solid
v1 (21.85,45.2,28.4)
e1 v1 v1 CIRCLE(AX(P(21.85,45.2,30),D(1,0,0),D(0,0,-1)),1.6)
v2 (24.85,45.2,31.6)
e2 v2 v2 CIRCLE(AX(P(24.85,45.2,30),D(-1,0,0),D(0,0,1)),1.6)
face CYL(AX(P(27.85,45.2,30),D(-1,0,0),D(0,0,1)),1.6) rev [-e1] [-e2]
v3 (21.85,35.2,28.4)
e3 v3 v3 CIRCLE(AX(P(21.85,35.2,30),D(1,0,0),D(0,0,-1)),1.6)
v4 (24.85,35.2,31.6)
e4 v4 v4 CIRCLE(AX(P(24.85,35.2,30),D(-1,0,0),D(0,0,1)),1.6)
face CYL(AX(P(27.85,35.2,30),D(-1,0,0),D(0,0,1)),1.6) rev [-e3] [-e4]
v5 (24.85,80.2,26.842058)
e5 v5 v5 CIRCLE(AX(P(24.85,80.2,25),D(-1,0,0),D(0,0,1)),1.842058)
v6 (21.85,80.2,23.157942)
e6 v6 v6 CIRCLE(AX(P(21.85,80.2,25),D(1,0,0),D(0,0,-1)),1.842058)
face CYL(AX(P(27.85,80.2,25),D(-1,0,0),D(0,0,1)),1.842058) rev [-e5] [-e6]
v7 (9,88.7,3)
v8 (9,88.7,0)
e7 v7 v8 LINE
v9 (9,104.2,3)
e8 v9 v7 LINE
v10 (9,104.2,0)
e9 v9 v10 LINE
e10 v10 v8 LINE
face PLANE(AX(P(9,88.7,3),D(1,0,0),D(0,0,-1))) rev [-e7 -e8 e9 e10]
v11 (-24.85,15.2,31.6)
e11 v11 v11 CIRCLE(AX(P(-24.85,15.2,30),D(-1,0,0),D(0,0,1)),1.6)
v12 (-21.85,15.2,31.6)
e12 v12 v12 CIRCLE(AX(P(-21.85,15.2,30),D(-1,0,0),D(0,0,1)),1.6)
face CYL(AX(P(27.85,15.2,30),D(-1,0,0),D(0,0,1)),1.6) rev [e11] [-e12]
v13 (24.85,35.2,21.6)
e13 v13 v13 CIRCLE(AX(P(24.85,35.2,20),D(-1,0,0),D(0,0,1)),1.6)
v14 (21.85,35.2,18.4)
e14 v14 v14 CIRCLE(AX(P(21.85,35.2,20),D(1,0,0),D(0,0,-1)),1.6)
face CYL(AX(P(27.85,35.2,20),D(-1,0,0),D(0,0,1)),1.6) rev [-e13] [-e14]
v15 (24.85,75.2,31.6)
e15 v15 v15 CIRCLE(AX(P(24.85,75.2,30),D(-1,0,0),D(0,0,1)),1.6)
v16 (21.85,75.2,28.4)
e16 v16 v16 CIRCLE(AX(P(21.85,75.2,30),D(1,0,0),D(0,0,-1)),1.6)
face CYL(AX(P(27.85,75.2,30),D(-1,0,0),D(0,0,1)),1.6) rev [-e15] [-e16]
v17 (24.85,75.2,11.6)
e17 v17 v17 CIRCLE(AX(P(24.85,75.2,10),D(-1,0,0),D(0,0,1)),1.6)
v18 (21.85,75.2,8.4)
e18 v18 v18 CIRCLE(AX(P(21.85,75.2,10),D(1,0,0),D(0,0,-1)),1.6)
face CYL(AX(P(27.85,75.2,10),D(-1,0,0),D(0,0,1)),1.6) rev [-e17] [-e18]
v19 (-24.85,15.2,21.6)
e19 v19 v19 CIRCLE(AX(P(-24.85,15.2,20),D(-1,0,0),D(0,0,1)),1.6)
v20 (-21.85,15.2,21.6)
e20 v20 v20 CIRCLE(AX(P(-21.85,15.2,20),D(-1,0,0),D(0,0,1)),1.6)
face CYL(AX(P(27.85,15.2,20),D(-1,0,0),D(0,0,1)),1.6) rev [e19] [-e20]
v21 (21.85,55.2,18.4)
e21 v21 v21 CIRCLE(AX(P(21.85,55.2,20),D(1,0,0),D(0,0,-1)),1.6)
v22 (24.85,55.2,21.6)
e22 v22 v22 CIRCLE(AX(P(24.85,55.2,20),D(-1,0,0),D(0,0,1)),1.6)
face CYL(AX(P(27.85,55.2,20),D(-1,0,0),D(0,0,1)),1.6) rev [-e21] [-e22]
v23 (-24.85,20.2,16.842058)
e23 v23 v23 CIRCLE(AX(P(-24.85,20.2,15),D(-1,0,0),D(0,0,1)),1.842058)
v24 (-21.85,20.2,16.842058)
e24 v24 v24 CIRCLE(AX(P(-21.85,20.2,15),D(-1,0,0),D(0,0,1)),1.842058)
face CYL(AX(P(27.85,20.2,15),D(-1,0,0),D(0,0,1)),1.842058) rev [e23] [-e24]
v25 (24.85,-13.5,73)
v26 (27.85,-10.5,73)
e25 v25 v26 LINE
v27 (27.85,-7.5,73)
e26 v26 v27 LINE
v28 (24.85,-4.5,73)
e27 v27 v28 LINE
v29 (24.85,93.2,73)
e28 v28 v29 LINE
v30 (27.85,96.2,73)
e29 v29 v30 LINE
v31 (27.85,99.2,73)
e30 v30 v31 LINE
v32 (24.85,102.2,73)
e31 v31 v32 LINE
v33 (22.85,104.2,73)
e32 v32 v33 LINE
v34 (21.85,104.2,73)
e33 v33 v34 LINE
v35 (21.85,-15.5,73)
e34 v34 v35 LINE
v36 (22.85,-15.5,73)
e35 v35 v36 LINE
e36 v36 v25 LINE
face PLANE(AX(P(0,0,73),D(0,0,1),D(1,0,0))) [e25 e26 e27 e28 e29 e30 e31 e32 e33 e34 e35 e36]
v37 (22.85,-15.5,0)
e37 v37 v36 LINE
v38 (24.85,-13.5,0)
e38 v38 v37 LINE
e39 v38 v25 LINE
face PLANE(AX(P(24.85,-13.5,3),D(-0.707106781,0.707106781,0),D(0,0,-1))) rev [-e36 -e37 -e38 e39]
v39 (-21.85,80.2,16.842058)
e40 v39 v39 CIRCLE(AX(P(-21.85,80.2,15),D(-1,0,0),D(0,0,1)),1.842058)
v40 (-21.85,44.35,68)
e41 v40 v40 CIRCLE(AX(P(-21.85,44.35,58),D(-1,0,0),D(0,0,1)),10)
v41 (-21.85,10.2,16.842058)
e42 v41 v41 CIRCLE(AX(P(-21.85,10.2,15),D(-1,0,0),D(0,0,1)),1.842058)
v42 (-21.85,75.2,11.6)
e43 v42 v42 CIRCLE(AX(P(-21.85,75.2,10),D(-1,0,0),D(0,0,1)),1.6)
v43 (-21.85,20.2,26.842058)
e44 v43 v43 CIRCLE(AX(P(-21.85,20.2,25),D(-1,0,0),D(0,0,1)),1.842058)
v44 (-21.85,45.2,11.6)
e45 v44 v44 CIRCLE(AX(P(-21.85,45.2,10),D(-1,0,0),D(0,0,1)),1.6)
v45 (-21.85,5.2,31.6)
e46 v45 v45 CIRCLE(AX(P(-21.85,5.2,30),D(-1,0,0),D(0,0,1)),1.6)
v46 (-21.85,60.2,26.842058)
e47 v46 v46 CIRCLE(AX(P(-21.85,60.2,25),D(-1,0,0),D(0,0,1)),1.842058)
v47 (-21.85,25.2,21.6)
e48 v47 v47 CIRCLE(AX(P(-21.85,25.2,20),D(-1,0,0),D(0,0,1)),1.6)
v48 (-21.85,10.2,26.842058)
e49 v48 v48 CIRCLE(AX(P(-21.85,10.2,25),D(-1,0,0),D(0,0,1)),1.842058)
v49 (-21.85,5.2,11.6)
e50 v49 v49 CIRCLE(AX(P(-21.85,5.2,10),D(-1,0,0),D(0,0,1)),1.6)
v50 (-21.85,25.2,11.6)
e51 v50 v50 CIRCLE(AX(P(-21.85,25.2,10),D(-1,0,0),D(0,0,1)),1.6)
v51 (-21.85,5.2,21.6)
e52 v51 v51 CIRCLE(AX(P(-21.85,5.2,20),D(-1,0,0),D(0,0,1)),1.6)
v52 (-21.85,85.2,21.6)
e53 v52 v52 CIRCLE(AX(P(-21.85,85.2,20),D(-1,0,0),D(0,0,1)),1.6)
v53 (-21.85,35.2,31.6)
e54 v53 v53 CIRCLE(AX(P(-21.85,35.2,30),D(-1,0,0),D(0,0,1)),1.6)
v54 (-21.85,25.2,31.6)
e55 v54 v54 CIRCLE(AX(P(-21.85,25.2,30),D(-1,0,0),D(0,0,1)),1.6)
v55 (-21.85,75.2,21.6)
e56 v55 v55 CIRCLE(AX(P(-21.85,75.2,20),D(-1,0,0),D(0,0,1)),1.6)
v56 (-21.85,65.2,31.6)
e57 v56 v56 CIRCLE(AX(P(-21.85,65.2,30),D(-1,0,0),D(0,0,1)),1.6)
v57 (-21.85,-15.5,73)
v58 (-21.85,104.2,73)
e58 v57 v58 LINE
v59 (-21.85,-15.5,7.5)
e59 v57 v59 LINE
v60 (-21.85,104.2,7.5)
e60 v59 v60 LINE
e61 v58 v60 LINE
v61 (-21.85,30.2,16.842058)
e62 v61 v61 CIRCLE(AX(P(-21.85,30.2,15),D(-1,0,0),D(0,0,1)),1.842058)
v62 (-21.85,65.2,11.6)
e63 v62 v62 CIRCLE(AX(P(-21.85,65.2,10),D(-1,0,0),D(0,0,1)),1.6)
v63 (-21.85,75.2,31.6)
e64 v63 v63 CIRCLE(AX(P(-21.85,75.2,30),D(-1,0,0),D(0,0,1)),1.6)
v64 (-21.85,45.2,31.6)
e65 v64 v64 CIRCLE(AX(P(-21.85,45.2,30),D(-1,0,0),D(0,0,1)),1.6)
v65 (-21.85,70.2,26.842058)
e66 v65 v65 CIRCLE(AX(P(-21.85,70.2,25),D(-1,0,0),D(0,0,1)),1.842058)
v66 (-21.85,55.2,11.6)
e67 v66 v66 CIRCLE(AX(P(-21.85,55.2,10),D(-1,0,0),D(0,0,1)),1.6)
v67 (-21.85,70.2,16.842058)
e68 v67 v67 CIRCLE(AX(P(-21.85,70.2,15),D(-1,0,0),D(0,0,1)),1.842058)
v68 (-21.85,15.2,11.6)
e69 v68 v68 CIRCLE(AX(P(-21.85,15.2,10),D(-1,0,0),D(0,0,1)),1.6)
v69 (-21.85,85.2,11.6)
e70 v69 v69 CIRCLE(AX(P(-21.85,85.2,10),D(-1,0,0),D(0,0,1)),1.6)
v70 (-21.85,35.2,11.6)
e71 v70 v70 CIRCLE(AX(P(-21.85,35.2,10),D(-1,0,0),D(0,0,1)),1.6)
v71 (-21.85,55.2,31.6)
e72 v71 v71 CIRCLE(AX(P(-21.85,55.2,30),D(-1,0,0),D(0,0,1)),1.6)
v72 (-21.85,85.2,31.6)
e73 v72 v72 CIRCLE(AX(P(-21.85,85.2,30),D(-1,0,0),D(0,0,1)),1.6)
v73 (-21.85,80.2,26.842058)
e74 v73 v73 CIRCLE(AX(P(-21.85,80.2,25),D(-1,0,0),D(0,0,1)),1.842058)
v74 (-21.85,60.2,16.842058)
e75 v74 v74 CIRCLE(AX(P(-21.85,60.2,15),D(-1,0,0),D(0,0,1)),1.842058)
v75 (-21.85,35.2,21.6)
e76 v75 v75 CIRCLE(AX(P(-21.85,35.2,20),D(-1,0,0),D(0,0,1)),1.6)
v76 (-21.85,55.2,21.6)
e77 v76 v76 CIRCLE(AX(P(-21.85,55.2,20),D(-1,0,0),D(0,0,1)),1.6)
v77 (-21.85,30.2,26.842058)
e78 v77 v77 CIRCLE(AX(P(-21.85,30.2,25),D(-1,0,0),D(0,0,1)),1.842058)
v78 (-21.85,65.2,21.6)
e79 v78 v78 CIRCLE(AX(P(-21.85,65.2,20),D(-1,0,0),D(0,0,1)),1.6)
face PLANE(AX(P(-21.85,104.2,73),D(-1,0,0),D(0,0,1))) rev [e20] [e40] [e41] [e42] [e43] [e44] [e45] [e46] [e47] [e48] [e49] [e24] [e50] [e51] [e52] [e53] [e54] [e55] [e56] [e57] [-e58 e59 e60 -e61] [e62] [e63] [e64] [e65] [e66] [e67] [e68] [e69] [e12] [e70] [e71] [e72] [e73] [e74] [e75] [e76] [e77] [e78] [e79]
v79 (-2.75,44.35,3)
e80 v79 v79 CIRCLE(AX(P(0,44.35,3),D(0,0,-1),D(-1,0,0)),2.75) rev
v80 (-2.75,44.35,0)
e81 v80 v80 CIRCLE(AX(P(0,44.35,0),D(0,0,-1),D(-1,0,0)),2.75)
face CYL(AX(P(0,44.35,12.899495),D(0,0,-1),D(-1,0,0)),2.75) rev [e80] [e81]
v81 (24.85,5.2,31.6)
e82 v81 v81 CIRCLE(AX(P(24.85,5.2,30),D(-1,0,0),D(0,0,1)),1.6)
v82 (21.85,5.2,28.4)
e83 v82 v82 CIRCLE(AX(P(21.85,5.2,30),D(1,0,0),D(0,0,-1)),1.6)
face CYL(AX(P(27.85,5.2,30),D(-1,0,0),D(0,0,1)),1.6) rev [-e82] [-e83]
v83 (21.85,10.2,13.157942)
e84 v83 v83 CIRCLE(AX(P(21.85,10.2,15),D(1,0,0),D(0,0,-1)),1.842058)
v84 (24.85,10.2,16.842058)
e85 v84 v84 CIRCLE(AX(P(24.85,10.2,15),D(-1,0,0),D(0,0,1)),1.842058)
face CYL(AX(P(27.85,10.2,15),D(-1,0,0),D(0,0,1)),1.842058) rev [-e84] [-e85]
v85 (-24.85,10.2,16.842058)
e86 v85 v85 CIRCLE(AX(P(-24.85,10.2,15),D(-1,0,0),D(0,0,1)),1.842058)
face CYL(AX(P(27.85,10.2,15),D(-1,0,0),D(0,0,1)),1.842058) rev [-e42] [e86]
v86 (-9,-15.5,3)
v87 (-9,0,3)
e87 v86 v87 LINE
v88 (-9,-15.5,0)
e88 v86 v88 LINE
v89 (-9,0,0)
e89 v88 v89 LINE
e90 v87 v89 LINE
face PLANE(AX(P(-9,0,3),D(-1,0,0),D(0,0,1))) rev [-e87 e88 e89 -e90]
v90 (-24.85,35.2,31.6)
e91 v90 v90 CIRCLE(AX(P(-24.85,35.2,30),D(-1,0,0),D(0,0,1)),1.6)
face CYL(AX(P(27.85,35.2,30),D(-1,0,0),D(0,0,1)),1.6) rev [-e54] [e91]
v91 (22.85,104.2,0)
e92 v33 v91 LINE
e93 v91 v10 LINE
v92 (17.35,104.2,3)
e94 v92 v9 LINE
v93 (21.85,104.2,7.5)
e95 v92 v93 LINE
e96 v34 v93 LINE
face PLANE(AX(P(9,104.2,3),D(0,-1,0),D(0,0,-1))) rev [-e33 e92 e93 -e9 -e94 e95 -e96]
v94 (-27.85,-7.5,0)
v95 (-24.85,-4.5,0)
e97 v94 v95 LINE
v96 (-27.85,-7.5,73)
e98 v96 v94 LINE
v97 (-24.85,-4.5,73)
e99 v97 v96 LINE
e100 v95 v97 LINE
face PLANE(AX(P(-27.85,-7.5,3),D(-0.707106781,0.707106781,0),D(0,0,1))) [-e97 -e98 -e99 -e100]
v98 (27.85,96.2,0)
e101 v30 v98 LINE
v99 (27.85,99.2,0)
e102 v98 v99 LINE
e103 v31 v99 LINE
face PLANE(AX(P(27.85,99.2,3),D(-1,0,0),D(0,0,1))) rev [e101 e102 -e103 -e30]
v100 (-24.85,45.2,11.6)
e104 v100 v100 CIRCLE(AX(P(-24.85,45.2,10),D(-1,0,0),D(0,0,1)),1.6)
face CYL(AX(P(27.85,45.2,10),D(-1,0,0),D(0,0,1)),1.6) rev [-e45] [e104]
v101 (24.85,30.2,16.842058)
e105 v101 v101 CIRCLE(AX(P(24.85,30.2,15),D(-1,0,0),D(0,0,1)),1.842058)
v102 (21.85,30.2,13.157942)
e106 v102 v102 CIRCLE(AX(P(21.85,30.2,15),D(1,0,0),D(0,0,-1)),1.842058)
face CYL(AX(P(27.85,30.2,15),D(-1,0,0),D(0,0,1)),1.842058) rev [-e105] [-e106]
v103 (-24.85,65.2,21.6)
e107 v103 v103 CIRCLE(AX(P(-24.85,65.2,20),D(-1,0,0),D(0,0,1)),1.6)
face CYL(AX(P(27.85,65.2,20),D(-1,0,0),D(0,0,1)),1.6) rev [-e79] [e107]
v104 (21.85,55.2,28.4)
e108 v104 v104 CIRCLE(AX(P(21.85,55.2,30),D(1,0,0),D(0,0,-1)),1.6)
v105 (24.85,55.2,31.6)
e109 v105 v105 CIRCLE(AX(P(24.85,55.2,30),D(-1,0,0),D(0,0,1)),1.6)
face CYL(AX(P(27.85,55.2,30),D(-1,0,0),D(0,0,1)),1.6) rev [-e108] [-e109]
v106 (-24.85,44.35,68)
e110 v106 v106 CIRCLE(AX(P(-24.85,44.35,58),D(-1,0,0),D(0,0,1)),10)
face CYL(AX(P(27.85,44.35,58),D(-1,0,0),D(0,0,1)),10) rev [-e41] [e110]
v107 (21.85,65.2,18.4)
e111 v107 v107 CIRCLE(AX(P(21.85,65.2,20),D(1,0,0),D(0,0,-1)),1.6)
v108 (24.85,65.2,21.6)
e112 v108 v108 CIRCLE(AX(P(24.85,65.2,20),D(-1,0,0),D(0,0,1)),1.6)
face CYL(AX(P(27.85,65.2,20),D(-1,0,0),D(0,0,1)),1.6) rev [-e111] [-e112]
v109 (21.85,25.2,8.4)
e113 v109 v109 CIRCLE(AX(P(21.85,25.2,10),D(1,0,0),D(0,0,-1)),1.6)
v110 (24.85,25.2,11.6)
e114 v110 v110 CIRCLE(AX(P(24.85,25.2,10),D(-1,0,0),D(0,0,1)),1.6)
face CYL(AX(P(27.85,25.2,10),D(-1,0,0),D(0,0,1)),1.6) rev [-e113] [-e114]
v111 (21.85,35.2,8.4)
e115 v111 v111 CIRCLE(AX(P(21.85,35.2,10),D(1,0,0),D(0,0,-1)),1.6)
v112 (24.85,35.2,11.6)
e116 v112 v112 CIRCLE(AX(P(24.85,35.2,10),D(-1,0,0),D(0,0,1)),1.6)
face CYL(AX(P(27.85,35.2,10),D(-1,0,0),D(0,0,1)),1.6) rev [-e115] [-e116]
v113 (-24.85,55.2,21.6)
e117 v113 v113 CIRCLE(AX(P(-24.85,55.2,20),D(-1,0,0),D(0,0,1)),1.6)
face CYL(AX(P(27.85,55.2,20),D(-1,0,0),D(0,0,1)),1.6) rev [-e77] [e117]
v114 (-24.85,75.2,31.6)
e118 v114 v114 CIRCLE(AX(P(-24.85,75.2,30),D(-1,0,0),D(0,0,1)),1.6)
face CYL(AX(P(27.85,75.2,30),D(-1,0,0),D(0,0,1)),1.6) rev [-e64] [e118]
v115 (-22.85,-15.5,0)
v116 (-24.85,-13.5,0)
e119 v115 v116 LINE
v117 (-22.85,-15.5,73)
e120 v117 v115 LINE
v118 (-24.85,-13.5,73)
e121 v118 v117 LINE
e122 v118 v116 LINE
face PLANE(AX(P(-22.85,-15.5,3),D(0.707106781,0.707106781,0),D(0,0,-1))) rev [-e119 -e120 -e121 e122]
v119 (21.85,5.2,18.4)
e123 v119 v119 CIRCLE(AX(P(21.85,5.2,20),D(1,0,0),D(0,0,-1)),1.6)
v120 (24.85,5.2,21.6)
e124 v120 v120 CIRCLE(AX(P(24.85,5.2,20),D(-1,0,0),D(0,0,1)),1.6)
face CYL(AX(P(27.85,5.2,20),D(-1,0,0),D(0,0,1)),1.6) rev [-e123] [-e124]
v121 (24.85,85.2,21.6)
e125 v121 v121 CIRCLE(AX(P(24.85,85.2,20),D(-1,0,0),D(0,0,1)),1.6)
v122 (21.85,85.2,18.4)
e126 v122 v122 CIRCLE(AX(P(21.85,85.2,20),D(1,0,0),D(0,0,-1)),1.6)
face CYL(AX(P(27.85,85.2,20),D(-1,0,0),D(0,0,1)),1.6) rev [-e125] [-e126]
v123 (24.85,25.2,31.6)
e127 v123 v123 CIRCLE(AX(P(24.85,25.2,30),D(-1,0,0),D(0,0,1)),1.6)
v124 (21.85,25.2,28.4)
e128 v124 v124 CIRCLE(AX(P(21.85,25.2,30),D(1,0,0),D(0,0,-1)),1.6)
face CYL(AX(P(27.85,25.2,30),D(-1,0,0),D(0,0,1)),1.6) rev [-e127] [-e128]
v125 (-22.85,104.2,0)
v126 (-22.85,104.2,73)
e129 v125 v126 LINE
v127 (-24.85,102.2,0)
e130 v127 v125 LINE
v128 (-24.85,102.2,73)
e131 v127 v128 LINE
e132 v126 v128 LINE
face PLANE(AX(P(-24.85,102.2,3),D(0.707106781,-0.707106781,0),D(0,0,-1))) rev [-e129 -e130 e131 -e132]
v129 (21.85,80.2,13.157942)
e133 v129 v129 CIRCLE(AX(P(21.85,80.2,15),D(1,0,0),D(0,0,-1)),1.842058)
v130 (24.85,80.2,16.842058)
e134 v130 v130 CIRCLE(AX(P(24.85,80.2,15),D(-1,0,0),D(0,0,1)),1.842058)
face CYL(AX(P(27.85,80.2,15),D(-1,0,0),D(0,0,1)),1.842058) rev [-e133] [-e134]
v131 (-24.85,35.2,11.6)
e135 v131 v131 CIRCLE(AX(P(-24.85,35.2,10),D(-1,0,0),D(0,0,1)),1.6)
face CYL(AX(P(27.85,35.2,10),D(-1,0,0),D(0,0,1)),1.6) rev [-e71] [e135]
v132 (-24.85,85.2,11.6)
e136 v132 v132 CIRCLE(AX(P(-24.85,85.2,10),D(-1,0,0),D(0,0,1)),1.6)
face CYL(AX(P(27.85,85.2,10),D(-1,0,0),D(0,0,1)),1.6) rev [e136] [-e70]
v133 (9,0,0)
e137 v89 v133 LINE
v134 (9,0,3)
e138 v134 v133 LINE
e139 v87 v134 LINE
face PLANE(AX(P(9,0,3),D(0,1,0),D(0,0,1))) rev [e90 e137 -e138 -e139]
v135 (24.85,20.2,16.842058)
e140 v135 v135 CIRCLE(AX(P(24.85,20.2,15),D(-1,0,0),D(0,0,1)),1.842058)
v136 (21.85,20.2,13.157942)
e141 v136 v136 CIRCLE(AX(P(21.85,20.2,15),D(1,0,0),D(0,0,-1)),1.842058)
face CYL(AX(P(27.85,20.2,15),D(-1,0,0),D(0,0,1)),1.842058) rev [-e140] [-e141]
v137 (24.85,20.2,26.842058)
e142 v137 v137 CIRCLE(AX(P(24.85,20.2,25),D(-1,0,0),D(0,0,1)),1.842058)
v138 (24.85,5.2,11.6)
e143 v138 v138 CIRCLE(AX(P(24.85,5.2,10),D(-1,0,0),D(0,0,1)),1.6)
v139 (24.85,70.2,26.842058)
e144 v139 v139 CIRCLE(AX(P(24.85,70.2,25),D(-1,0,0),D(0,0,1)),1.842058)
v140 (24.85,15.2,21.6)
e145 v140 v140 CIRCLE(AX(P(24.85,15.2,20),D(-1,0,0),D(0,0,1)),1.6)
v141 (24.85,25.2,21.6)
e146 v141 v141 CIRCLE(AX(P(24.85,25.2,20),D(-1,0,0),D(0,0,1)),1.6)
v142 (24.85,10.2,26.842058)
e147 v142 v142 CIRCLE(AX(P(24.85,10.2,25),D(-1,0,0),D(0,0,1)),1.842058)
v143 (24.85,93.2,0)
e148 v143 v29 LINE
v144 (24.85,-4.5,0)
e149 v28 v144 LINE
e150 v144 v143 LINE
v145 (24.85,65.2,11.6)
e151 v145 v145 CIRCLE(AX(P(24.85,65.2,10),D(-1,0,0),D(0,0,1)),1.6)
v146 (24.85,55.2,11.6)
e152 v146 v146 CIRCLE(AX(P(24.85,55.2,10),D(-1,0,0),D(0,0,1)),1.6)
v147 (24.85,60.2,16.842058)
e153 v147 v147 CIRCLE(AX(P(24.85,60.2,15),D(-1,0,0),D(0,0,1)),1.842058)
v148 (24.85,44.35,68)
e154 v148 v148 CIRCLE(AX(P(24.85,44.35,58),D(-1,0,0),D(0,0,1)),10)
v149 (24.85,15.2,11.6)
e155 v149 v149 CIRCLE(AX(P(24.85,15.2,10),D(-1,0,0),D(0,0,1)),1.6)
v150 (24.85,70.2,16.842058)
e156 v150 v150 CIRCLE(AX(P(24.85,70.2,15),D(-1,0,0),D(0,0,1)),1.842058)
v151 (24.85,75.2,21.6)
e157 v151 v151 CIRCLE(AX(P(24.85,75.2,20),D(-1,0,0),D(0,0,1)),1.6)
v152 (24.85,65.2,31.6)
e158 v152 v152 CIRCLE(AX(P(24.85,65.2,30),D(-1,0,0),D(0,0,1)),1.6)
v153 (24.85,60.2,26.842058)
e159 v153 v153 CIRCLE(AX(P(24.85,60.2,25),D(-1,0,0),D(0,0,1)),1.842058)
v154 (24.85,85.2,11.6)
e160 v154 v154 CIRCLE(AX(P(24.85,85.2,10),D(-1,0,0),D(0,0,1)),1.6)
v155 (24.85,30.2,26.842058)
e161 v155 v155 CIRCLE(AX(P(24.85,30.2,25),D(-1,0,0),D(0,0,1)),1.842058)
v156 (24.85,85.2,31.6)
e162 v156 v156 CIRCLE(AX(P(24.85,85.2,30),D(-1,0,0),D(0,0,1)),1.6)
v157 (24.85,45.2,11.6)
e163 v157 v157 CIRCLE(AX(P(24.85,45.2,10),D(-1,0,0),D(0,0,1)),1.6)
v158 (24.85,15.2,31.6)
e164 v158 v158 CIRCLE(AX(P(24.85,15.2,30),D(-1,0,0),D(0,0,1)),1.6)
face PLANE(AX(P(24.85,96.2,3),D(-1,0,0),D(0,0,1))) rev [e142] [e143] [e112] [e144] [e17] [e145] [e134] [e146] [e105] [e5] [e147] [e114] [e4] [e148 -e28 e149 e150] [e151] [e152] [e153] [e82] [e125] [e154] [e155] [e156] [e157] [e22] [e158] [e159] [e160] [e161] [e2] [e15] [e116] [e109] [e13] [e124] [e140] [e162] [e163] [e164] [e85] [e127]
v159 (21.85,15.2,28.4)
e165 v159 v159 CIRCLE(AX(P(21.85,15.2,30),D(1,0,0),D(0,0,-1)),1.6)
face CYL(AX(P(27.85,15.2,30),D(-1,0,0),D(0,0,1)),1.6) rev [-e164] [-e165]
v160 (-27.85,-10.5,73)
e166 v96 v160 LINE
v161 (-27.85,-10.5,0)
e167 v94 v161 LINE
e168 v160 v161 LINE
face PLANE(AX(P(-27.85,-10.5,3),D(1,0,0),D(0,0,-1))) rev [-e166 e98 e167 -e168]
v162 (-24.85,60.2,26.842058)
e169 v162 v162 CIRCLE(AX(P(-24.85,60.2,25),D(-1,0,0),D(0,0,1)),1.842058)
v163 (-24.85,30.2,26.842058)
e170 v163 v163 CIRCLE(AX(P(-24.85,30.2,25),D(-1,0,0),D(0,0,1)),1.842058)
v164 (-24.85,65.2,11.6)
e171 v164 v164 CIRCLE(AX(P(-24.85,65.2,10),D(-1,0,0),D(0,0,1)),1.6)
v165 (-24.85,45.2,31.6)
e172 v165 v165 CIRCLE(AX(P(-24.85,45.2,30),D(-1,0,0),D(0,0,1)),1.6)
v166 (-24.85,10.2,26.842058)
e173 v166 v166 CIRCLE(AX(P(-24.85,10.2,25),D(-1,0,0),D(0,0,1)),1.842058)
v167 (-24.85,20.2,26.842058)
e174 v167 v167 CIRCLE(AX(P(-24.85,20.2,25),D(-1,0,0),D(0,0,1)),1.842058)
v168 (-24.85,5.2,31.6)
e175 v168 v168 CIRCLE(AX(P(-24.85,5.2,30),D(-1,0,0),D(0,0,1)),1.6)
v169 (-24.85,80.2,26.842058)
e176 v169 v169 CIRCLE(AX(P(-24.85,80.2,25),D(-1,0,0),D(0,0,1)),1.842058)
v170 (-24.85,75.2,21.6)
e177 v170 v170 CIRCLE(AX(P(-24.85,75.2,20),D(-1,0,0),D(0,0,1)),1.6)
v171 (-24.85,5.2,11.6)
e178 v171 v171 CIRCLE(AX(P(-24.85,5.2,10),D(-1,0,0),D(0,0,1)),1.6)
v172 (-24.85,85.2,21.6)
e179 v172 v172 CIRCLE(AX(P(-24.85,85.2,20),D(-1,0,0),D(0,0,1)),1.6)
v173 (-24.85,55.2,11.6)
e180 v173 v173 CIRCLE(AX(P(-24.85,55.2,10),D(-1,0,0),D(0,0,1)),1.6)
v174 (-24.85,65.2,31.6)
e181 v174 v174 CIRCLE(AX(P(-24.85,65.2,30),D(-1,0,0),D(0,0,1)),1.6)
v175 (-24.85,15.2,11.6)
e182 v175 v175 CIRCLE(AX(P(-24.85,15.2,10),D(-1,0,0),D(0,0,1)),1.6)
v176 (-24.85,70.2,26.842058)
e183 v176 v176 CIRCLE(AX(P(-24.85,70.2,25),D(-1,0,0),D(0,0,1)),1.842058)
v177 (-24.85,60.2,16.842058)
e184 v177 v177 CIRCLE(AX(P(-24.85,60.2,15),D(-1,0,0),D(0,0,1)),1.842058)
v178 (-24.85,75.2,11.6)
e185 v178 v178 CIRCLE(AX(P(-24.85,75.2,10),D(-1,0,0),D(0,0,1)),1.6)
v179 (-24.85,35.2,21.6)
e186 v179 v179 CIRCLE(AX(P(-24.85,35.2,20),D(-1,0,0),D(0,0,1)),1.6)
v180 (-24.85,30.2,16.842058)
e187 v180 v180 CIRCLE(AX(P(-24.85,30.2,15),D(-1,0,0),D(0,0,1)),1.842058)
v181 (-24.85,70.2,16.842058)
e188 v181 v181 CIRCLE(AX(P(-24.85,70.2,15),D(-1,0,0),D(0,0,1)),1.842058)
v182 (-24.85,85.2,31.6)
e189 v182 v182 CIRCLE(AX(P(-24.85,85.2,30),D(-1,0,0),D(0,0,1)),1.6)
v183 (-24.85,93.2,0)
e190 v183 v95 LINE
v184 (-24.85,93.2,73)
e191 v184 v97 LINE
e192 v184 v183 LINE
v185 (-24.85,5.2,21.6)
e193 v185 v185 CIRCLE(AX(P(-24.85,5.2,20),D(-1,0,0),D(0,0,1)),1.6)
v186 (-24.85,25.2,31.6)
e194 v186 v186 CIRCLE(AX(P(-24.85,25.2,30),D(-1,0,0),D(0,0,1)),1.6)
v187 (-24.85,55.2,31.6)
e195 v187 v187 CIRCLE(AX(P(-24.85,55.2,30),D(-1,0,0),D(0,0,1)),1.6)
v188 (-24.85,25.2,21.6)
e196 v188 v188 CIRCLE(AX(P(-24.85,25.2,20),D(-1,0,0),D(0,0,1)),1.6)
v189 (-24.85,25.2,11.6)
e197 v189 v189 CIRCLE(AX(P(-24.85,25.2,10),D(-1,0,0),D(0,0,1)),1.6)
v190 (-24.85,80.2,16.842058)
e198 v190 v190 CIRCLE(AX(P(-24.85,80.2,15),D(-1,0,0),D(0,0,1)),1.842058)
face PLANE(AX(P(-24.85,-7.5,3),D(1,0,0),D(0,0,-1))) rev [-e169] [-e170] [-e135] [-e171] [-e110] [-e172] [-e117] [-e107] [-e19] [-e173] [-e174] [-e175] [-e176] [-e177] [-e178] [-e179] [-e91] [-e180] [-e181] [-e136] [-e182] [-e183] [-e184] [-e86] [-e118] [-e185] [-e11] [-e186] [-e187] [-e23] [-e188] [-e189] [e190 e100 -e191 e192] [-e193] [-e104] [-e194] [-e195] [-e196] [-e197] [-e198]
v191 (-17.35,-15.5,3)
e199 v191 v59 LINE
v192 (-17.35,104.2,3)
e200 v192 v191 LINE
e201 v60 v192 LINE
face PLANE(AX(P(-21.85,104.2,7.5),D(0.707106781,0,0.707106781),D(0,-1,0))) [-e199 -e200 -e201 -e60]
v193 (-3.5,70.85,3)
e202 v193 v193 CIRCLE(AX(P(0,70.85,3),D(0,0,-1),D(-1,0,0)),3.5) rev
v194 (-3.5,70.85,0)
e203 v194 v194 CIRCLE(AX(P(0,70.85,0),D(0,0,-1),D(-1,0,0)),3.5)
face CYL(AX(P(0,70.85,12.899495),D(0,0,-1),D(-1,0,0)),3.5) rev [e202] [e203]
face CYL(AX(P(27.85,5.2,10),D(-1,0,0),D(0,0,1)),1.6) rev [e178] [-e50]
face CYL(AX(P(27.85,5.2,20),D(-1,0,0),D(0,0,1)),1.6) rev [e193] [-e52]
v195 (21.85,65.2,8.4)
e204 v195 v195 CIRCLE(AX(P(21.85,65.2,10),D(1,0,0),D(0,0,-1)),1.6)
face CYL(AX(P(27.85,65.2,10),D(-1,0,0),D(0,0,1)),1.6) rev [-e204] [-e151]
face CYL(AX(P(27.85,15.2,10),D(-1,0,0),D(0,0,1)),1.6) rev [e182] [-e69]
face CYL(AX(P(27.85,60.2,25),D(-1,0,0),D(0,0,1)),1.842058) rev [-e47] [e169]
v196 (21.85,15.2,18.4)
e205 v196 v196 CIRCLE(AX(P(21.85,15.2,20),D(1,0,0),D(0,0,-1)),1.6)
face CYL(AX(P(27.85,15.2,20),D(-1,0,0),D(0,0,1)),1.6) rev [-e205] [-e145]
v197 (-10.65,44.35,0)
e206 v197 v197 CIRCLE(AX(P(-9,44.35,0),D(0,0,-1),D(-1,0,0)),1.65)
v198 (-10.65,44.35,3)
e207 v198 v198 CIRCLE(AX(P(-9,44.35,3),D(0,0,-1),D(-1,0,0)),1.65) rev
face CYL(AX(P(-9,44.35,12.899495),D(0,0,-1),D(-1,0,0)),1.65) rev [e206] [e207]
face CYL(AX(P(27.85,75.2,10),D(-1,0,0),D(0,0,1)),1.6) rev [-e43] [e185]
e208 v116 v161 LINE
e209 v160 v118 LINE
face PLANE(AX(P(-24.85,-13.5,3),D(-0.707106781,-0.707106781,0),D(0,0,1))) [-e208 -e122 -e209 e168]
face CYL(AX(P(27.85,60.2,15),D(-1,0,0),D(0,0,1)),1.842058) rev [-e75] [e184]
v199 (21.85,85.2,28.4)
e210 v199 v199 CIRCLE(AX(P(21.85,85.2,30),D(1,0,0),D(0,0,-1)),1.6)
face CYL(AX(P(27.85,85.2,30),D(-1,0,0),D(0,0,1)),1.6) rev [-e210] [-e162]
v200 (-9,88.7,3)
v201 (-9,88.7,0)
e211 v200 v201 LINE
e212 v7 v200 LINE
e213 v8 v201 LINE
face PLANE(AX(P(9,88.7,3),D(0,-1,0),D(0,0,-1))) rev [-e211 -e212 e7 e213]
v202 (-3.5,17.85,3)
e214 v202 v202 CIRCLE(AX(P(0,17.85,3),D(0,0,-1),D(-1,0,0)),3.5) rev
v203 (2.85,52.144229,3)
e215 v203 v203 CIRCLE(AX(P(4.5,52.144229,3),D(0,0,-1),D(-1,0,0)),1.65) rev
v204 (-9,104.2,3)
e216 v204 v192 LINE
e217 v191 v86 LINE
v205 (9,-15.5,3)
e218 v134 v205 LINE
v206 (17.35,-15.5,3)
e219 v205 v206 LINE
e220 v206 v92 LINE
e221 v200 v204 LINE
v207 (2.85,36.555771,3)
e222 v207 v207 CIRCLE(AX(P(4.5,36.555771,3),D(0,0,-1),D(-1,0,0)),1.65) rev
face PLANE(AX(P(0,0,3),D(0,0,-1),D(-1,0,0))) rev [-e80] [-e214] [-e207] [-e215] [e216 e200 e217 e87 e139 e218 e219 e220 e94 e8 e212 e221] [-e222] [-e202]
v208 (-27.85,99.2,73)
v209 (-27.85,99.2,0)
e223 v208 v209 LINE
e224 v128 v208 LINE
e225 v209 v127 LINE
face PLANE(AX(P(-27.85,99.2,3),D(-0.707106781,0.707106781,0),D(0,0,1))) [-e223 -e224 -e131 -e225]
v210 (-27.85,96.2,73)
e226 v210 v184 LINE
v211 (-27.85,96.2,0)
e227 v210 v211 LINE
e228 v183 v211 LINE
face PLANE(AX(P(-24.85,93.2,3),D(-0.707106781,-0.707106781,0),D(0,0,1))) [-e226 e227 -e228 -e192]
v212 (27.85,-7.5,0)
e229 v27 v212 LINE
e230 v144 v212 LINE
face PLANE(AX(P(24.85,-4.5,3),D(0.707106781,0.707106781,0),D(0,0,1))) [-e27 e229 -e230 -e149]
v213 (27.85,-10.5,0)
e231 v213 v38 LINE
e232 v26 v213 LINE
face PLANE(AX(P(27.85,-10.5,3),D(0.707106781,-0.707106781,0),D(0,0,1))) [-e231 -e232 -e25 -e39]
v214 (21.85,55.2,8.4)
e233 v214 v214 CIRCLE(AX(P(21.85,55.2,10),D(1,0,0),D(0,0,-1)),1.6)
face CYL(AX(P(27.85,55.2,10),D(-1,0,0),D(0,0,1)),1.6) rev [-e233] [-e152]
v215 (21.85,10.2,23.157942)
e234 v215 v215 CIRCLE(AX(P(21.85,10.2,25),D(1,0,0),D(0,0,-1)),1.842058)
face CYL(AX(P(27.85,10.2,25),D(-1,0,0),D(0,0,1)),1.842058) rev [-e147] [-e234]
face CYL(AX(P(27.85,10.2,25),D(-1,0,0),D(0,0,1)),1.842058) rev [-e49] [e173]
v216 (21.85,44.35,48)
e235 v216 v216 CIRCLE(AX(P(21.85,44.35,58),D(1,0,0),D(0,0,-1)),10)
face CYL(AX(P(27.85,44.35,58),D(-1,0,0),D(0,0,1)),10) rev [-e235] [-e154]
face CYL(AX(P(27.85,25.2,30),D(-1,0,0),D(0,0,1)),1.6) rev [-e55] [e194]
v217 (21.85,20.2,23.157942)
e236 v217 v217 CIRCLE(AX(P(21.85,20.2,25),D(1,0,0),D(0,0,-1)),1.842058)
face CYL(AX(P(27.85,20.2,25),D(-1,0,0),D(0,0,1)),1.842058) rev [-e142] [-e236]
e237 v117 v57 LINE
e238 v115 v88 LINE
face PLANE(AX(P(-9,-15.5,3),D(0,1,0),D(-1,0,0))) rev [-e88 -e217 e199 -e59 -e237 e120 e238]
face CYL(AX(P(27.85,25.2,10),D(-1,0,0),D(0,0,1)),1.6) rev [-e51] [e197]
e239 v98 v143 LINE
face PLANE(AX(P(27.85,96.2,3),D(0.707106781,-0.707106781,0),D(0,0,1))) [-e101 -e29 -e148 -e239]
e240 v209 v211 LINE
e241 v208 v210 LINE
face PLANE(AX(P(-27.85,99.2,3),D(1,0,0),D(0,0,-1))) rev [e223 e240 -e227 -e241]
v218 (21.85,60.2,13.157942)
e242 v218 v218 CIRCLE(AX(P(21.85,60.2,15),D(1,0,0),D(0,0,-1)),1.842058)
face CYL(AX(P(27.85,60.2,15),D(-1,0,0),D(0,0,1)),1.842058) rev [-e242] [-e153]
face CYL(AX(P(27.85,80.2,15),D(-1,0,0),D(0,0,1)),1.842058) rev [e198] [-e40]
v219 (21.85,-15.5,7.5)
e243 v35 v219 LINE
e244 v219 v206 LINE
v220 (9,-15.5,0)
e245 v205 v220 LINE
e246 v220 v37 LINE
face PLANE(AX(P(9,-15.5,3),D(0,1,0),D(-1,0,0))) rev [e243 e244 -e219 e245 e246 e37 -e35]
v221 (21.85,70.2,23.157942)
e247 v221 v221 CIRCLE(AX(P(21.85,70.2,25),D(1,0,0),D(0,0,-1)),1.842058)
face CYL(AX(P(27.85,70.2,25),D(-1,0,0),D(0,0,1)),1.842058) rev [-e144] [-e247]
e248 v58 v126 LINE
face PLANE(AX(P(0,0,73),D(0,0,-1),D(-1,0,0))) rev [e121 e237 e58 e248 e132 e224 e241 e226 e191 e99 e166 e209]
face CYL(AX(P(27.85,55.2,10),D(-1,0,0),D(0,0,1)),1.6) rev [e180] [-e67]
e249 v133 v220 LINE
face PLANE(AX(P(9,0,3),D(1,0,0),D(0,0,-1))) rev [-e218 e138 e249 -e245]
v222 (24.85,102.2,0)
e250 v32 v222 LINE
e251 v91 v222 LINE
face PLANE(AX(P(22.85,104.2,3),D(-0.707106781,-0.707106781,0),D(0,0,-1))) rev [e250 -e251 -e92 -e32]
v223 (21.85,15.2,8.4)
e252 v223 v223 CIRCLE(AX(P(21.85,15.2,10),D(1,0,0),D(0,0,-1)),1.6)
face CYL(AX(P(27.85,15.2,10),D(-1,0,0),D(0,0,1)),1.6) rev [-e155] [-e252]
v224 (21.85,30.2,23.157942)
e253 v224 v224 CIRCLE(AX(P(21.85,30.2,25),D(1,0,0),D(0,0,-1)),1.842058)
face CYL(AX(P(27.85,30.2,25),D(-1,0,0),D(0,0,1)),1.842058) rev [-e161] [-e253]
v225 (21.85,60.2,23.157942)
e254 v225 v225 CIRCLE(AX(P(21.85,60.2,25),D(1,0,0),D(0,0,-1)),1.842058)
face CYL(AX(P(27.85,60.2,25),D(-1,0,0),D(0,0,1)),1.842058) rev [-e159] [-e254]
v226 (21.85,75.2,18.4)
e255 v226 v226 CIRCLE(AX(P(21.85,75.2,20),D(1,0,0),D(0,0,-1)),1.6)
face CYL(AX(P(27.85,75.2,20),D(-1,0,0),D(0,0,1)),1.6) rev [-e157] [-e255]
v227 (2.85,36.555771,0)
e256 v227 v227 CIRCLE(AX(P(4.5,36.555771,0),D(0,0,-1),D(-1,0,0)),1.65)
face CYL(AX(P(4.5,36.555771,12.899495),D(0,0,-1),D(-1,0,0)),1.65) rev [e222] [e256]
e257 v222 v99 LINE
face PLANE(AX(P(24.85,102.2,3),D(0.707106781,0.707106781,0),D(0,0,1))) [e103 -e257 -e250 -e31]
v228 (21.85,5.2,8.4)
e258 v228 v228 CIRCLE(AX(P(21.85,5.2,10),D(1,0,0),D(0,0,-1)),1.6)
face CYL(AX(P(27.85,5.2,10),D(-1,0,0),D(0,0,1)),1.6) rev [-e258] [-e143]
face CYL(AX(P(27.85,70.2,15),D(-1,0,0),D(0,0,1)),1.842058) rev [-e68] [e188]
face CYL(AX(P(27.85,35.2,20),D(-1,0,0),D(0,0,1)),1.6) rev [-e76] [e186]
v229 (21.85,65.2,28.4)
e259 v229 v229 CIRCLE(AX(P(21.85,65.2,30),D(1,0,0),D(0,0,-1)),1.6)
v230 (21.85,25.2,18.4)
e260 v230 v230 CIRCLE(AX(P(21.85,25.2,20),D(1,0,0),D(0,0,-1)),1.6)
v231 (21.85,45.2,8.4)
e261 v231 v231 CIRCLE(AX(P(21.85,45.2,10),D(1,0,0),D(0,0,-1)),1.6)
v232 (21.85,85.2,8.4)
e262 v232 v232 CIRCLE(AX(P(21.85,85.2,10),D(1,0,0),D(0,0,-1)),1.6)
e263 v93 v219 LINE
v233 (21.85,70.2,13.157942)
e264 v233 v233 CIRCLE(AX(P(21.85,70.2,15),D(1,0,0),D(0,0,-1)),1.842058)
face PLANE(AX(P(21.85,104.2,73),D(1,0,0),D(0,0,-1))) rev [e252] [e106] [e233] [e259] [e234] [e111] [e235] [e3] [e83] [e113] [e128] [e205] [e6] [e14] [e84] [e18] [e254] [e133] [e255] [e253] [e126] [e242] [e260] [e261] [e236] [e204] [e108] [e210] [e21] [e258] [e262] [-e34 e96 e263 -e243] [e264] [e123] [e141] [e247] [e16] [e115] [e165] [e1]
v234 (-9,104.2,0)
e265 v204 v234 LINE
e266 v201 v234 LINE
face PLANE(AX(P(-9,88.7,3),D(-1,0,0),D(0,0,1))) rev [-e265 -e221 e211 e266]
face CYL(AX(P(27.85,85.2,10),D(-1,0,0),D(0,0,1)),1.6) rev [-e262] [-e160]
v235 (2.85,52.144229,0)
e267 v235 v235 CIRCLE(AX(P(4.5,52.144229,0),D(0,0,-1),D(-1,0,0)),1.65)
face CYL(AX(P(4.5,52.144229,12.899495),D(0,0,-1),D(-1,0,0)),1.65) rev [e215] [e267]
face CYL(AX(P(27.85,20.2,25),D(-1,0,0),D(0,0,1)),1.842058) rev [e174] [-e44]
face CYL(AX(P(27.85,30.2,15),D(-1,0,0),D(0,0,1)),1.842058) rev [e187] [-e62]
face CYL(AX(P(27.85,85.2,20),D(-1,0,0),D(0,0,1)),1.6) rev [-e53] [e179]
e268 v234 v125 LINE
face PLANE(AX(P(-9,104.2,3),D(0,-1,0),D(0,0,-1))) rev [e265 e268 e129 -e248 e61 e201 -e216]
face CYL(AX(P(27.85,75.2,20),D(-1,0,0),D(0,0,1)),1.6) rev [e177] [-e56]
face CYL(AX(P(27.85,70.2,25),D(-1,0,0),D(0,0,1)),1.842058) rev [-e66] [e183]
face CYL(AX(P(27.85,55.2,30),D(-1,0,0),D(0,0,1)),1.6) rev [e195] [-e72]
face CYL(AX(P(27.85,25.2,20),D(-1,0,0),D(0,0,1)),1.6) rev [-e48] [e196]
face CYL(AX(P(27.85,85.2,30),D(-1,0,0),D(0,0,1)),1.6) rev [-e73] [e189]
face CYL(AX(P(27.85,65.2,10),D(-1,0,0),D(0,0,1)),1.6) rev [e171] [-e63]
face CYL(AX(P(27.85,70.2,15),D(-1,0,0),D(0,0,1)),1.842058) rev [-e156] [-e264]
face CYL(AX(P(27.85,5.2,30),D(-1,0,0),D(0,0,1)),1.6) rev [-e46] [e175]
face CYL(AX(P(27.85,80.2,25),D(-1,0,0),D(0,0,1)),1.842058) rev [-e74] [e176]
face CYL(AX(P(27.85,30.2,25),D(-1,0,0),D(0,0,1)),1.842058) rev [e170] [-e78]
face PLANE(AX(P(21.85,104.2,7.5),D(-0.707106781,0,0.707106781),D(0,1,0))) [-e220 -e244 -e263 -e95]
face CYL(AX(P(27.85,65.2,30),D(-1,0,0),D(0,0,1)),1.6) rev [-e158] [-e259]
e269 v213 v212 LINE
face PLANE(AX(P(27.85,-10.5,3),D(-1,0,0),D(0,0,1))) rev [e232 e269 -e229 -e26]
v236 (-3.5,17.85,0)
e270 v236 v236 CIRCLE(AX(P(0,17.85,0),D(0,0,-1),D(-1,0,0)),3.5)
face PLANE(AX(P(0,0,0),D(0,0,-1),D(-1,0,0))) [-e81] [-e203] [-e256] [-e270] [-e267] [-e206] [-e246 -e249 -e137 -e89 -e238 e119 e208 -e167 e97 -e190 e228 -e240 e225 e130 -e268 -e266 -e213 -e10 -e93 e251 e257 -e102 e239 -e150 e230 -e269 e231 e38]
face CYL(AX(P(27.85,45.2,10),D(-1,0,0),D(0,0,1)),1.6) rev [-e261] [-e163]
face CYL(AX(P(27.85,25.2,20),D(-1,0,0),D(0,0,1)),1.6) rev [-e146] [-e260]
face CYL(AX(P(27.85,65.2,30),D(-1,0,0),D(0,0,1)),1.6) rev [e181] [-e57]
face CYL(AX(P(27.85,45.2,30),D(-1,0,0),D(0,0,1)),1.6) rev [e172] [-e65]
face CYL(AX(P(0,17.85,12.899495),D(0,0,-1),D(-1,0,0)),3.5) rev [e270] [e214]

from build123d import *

# Parameters (mm, degrees)
BOSS_EXTRUDE1_DEPTH = 3
BOSS_EXTRUDE2_DEPTH = 70
SKETCH3_R           = 1.65
SKETCH3_R_2         = 2.75
SKETCH3_R_3         = 3.5
CUT_EXTRUDE1_DEPTH  = 3
CHAMFER1_SIZE       = 4.5
CHAMFER2_SIZE       = 3
SKETCH4_R           = 10
SKETCH4_R_2         = 1.6
SKETCH4_R_3         = 1.842058484
CUT_EXTRUDE2_DEPTH  = 138.709585723
CHAMFER3_SIZE       = 2


with BuildPart() as part:
    # Sketch1 → Boss-Extrude1 (new body)
    with BuildSketch(Plane.XY):
        Polygon((9, 0), (-9, 0), (-9, -15.5), (-24.85, -15.5), (-24.85, -10.5), (-27.85, -10.5), (-27.85, -7.5), (-24.85, -7.5), (-24.85, 36.35), (-24.85, 41.85), (-24.85, 46.85), (-24.85, 52.35), (-24.85, 96.2), (-27.85, 96.2), (-27.85, 99.2), (-24.85, 99.2), (-24.85, 104.2), (-9, 104.2), (-9, 88.7), (9, 88.7), (9, 104.2), (24.85, 104.2), (24.85, 99.2), (27.85, 99.2), (27.85, 96.2), (24.85, 96.2), (24.85, 52.35), (24.85, 46.85), (24.85, 41.85), (24.85, 36.35), (24.85, -7.5), (27.85, -7.5), (27.85, -10.5), (24.85, -10.5), (24.85, -15.5), (9, -15.5), align=None)
    extrude(amount=BOSS_EXTRUDE1_DEPTH)

    # Sketch2 → Boss-Extrude2 (add)
    with BuildSketch(Plane.XY.offset(3)):
        Polygon((-24.85, 104.2), (-21.85, 104.2), (-21.85, -15.5), (-24.85, -15.5), (-24.85, -10.5), (-27.85, -10.5), (-27.85, -7.5), (-24.85, -7.5), (-24.85, 96.2), (-27.85, 96.2), (-27.85, 99.2), (-24.85, 99.2), align=None)
        Polygon((21.85, 104.2), (21.85, -15.5), (24.85, -15.5), (24.85, -10.5), (27.85, -10.5), (27.85, -7.5), (24.85, -7.5), (24.85, 96.2), (27.85, 96.2), (27.85, 99.2), (24.85, 99.2), (24.85, 104.2), align=None)
    extrude(amount=BOSS_EXTRUDE2_DEPTH)

    # Sketch3 → Cut-Extrude1 (cut)
    with BuildSketch(Plane(origin=(0, 0, 0), x_dir=(-1, 0, 0), z_dir=(0, 0, -1))):
        with Locations((9, 44.35)):
            Circle(SKETCH3_R)
        with Locations((-4.5, 36.555771366)):
            Circle(SKETCH3_R)
        with Locations((-4.5, 52.144228634)):
            Circle(SKETCH3_R)
        with Locations((0, 44.35)):
            Circle(SKETCH3_R_2)
        with Locations((0, 70.85)):
            Circle(SKETCH3_R_3)
        with Locations((0, 17.85)):
            Circle(SKETCH3_R_3)
    extrude(amount=-CUT_EXTRUDE1_DEPTH, mode=Mode.SUBTRACT)

    # Chamfer1
    chamfer1_edges = [part.edges().sort_by_distance(p)[0] for p in [
        (-21.85, 44.35, 3),
        (21.85, 44.35, 3),
    ]]
    chamfer(chamfer1_edges, length=CHAMFER1_SIZE)

    # Chamfer2
    chamfer2_edges = [part.edges().sort_by_distance(p)[0] for p in [
        (24.85, 99.2, 36.5),
        (24.85, 96.2, 36.5),
        (24.85, -10.5, 36.5),
        (24.85, -7.5, 36.5),
        (-24.85, -7.5, 36.5),
        (-24.85, -10.5, 36.5),
        (-24.85, 99.2, 36.5),
        (-24.85, 96.2, 36.5),
    ]]
    chamfer(chamfer2_edges, length=CHAMFER2_SIZE - 0.0001)  # a hair under: the kernel refuses the full size

    # Sketch4 → Cut-Extrude2 (cut, through all)
    with BuildSketch(Plane.ZY.offset(24.85)):
        with Locations((58, 44.35)):
            Circle(SKETCH4_R)
        with Locations((10, 85.2)):
            Circle(SKETCH4_R_2)
        with Locations((20, 85.2)):
            Circle(SKETCH4_R_2)
        with Locations((30, 85.2)):
            Circle(SKETCH4_R_2)
        with Locations((20, 75.2)):
            Circle(SKETCH4_R_2)
        with Locations((30, 75.2)):
            Circle(SKETCH4_R_2)
        with Locations((20, 65.2)):
            Circle(SKETCH4_R_2)
        with Locations((30, 65.2)):
            Circle(SKETCH4_R_2)
        with Locations((20, 55.2)):
            Circle(SKETCH4_R_2)
        with Locations((30, 55.2)):
            Circle(SKETCH4_R_2)
        with Locations((30, 45.2)):
            Circle(SKETCH4_R_2)
        with Locations((20, 35.2)):
            Circle(SKETCH4_R_2)
        with Locations((30, 35.2)):
            Circle(SKETCH4_R_2)
        with Locations((20, 25.2)):
            Circle(SKETCH4_R_2)
        with Locations((30, 25.2)):
            Circle(SKETCH4_R_2)
        with Locations((20, 15.2)):
            Circle(SKETCH4_R_2)
        with Locations((30, 15.2)):
            Circle(SKETCH4_R_2)
        with Locations((20, 5.2)):
            Circle(SKETCH4_R_2)
        with Locations((30, 5.2)):
            Circle(SKETCH4_R_2)
        with Locations((10, 75.2)):
            Circle(SKETCH4_R_2)
        with Locations((10, 65.2)):
            Circle(SKETCH4_R_2)
        with Locations((10, 55.2)):
            Circle(SKETCH4_R_2)
        with Locations((10, 45.2)):
            Circle(SKETCH4_R_2)
        with Locations((10, 35.2)):
            Circle(SKETCH4_R_2)
        with Locations((10, 25.2)):
            Circle(SKETCH4_R_2)
        with Locations((10, 15.2)):
            Circle(SKETCH4_R_2)
        with Locations((10, 5.2)):
            Circle(SKETCH4_R_2)
        with Locations((15, 80.2)):
            Circle(SKETCH4_R_3)
        with Locations((25, 80.2)):
            Circle(SKETCH4_R_3)
        with Locations((25, 70.2)):
            Circle(SKETCH4_R_3)
        with Locations((25, 60.2)):
            Circle(SKETCH4_R_3)
        with Locations((25, 30.2)):
            Circle(SKETCH4_R_3)
        with Locations((25, 20.2)):
            Circle(SKETCH4_R_3)
        with Locations((25, 10.2)):
            Circle(SKETCH4_R_3)
        with Locations((15, 70.2)):
            Circle(SKETCH4_R_3)
        with Locations((15, 60.2)):
            Circle(SKETCH4_R_3)
        with Locations((15, 30.2)):
            Circle(SKETCH4_R_3)
        with Locations((15, 20.2)):
            Circle(SKETCH4_R_3)
        with Locations((15, 10.2)):
            Circle(SKETCH4_R_3)
    extrude(amount=-CUT_EXTRUDE2_DEPTH, mode=Mode.SUBTRACT)

    # Chamfer3
    chamfer3_edges = [part.edges().sort_by_distance(p)[0] for p in [
        (24.85, -15.5, 36.5),
        (-24.85, -15.5, 36.5),
        (24.85, 104.2, 36.5),
        (-24.85, 104.2, 36.5),
    ]]
    chamfer(chamfer3_edges, length=CHAMFER3_SIZE)


solid = part.part
